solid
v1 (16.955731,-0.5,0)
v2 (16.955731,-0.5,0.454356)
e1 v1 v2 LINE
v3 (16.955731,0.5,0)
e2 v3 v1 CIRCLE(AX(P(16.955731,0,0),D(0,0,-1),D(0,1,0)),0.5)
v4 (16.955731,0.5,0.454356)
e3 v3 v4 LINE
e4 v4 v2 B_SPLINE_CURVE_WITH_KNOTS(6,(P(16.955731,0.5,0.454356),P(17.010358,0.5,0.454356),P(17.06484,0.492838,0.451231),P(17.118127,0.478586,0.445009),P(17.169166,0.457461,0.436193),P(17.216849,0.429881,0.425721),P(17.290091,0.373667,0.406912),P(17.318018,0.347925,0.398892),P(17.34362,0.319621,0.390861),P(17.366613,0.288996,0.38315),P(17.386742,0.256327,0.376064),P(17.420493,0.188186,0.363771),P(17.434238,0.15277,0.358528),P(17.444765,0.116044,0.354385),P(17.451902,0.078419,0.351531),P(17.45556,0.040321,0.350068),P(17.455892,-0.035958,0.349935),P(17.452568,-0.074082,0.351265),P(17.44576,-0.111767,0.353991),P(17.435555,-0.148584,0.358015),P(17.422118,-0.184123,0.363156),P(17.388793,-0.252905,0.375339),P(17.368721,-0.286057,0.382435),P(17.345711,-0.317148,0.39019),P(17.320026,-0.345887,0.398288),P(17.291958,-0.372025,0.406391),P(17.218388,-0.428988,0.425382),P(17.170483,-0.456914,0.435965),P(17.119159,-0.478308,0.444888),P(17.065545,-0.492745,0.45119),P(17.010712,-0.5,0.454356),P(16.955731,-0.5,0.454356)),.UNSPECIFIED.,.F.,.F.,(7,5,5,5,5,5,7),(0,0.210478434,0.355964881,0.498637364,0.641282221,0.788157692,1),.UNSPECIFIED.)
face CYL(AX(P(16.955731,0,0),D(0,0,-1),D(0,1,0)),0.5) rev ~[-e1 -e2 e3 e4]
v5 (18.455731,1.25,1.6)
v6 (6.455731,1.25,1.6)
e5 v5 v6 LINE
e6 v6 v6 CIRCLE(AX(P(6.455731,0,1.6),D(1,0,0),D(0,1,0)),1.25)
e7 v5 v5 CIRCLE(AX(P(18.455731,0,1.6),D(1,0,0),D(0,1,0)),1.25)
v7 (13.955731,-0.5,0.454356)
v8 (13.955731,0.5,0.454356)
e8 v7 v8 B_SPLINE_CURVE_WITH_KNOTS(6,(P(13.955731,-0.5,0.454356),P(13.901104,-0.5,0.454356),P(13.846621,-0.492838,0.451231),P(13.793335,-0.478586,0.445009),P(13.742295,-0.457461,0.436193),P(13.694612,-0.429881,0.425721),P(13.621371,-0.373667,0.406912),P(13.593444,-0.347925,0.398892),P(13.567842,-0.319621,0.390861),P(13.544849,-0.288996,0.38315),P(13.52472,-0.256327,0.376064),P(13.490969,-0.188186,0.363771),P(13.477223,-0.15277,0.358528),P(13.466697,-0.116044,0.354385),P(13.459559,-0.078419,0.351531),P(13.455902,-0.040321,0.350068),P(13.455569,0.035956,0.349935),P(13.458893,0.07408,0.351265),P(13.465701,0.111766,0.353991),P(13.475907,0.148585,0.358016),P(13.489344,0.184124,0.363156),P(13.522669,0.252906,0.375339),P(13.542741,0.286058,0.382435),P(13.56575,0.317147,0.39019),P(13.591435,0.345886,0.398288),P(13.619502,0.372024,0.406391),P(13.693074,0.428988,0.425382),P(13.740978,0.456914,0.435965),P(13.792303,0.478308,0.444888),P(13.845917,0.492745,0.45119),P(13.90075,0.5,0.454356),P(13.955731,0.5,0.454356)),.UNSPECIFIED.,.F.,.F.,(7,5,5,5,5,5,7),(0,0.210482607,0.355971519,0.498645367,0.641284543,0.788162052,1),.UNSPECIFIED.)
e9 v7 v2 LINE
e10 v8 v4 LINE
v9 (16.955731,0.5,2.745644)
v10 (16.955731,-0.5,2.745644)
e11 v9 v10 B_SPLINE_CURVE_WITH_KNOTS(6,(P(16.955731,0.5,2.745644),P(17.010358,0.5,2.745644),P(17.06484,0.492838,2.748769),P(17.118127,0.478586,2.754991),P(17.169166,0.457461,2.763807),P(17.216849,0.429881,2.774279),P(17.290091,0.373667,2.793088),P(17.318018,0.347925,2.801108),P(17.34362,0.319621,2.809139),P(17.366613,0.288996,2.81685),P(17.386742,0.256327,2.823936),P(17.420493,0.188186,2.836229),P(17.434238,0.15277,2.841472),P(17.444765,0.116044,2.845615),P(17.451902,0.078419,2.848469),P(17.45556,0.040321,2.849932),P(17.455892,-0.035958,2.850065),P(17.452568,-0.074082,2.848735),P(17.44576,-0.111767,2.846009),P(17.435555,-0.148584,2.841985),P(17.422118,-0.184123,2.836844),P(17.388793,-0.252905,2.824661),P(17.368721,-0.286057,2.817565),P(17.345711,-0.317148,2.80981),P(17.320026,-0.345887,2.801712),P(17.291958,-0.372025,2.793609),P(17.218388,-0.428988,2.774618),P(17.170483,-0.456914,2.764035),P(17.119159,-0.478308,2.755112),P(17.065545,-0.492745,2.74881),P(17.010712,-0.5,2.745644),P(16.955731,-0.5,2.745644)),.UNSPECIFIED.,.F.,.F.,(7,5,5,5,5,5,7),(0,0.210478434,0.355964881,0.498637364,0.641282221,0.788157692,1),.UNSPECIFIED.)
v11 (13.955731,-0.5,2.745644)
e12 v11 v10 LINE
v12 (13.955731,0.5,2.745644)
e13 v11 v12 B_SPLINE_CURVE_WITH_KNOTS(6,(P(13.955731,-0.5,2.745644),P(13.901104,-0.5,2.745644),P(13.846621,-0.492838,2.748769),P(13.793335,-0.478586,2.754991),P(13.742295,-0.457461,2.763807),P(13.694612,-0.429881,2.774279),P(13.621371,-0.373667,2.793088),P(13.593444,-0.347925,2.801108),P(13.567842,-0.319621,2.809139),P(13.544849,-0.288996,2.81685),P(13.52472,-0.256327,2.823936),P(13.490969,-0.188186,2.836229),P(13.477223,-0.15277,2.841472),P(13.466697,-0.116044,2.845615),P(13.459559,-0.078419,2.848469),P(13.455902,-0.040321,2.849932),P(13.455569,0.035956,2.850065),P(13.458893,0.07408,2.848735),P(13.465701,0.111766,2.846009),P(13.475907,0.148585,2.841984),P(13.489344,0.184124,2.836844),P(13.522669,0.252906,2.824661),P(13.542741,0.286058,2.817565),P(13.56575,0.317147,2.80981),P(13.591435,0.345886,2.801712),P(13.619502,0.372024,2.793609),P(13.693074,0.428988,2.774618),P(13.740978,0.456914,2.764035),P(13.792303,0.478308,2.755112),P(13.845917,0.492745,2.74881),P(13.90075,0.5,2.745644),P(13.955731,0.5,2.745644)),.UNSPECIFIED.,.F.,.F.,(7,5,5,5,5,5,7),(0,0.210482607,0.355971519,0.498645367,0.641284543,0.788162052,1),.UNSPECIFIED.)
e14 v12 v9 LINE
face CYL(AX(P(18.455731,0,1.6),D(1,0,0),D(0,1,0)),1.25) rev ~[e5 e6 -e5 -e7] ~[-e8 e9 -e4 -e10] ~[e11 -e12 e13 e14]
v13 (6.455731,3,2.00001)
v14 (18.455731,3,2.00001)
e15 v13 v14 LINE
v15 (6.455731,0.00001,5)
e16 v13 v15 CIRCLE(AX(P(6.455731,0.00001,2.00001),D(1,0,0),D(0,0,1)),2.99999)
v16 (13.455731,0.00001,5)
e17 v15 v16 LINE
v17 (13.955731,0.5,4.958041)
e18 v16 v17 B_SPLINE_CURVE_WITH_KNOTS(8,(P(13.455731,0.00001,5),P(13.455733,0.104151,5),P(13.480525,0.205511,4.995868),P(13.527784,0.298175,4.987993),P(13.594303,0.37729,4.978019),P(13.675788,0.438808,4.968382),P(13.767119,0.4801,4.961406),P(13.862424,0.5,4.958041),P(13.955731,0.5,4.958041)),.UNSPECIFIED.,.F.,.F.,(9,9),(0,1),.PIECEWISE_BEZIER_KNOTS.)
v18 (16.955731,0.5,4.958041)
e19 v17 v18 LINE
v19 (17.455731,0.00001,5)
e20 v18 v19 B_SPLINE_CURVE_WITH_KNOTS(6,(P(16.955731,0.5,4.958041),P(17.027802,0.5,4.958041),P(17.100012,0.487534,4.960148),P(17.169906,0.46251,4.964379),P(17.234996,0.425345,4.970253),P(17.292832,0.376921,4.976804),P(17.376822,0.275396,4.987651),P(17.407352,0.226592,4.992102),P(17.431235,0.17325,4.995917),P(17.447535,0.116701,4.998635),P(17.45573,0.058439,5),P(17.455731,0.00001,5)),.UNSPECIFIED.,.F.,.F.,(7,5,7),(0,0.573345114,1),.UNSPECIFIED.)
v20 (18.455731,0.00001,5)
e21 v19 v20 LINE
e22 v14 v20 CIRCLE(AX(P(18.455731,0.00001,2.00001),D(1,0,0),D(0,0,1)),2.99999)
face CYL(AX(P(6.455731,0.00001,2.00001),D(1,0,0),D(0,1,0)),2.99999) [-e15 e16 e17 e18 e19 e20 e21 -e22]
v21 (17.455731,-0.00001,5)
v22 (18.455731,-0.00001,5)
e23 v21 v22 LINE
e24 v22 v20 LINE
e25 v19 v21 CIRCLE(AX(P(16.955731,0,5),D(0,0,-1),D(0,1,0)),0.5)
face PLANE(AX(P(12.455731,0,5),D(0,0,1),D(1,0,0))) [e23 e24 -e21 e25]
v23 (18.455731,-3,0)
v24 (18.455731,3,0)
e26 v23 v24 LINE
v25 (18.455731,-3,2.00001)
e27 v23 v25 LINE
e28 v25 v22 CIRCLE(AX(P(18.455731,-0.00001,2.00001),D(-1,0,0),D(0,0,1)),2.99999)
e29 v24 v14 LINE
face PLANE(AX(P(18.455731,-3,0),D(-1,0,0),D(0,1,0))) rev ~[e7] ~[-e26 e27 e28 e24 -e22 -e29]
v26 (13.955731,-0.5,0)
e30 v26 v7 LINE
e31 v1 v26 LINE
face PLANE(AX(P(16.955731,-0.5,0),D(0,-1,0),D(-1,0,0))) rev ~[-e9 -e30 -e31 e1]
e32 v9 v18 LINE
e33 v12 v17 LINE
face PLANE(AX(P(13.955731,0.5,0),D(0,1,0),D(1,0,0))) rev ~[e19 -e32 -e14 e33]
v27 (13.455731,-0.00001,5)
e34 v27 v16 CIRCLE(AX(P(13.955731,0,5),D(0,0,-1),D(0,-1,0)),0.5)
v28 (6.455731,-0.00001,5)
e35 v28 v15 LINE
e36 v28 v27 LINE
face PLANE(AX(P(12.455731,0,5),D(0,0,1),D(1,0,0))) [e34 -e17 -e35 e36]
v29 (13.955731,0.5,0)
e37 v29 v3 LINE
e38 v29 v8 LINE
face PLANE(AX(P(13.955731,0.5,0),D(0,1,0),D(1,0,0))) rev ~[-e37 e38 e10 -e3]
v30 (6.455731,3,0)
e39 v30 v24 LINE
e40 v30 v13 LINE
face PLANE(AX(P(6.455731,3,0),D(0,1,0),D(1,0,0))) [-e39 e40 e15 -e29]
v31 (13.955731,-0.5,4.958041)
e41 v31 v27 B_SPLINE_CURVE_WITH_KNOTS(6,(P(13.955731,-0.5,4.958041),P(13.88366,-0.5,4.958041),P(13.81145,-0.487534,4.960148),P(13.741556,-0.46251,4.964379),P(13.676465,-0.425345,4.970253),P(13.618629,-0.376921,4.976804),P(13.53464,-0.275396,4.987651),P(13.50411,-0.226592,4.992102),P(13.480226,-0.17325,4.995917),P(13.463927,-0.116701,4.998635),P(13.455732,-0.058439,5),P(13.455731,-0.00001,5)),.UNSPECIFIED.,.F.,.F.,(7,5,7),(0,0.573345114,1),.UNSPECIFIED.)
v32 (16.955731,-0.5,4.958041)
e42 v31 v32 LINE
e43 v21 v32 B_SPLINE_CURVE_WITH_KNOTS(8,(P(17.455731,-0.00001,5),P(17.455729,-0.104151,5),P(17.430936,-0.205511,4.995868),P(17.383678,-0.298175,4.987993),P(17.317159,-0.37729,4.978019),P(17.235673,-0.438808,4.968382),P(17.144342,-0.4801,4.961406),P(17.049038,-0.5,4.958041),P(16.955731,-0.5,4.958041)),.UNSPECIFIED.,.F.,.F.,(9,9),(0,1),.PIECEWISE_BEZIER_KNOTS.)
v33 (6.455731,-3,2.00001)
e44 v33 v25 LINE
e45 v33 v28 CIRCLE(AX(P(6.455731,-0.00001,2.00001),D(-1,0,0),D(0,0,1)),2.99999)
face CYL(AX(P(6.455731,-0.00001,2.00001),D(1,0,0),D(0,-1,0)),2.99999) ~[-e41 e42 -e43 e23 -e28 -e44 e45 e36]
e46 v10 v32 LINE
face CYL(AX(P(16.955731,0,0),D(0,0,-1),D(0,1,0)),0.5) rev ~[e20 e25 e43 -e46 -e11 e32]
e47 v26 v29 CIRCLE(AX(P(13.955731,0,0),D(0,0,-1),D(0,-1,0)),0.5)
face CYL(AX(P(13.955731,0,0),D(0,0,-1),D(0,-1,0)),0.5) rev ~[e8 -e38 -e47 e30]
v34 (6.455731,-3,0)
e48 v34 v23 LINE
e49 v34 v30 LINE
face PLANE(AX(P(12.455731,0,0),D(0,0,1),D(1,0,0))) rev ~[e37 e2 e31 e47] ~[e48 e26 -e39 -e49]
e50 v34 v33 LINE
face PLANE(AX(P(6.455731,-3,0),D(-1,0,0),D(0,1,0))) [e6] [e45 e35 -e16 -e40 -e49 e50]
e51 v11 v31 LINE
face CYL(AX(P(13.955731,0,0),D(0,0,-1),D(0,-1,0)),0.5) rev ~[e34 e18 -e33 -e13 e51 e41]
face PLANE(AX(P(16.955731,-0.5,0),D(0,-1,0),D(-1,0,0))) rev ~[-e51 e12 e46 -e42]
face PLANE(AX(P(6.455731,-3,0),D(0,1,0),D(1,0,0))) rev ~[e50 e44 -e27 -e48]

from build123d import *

# Parameters (mm, degrees)
F0_W     = 12
F0_H     = 6
F1_DEPTH = 5
F2_R     = 2.99999
F3_R     = 1.25
F4_DEPTH = 25
F6_DEPTH = 25


# Not quite as in the source:
# - a fillet or chamfer is up to 0.001 mm smaller than in the source, because OpenCascade refuses the exact size


with BuildPart() as f1:
    # F0 (on Top) → F1 (new body)
    with BuildSketch(Plane.XY):
        with Locations((12.4557307512, 0)):
            Rectangle(F0_W, F0_H)
    extrude(amount=F1_DEPTH)

    # F2 (radius 3 in the source; OpenCascade refuses exactly that, so slightly less here)
    f2_edges = [f1.edges().sort_by_distance(p)[0] for p in [
        (12.455731, -3, 5),
        (12.455731, 3, 5),
    ]]
    fillet(f2_edges, radius=F2_R)

    # F3 (on face) → F4 (cut)
    with BuildSketch(Plane.YZ.offset(18.4557307512)):
        with Locations((0, 1.6)):
            Circle(F3_R)
    extrude(amount=-F4_DEPTH, mode=Mode.SUBTRACT)

    # F5 (on face) → F6 (cut)
    with BuildSketch(Plane(origin=(0, 0, 0), x_dir=(1, 0, 0), z_dir=(0, 0, -1))):
        with BuildLine():
            Line((13.9557307512, -0.5), (16.9557307512, -0.5))
            ThreePointArc((16.9557307512, -0.5), (17.4557307512, 0), (16.9557307512, 0.5))
            Line((16.9557307512, 0.5), (13.9557307512, 0.5))
            ThreePointArc((13.9557307512, 0.5), (13.4557307512, 0), (13.9557307512, -0.5))
        make_face()
    extrude(amount=-F6_DEPTH, mode=Mode.SUBTRACT)


solid = f1.part
